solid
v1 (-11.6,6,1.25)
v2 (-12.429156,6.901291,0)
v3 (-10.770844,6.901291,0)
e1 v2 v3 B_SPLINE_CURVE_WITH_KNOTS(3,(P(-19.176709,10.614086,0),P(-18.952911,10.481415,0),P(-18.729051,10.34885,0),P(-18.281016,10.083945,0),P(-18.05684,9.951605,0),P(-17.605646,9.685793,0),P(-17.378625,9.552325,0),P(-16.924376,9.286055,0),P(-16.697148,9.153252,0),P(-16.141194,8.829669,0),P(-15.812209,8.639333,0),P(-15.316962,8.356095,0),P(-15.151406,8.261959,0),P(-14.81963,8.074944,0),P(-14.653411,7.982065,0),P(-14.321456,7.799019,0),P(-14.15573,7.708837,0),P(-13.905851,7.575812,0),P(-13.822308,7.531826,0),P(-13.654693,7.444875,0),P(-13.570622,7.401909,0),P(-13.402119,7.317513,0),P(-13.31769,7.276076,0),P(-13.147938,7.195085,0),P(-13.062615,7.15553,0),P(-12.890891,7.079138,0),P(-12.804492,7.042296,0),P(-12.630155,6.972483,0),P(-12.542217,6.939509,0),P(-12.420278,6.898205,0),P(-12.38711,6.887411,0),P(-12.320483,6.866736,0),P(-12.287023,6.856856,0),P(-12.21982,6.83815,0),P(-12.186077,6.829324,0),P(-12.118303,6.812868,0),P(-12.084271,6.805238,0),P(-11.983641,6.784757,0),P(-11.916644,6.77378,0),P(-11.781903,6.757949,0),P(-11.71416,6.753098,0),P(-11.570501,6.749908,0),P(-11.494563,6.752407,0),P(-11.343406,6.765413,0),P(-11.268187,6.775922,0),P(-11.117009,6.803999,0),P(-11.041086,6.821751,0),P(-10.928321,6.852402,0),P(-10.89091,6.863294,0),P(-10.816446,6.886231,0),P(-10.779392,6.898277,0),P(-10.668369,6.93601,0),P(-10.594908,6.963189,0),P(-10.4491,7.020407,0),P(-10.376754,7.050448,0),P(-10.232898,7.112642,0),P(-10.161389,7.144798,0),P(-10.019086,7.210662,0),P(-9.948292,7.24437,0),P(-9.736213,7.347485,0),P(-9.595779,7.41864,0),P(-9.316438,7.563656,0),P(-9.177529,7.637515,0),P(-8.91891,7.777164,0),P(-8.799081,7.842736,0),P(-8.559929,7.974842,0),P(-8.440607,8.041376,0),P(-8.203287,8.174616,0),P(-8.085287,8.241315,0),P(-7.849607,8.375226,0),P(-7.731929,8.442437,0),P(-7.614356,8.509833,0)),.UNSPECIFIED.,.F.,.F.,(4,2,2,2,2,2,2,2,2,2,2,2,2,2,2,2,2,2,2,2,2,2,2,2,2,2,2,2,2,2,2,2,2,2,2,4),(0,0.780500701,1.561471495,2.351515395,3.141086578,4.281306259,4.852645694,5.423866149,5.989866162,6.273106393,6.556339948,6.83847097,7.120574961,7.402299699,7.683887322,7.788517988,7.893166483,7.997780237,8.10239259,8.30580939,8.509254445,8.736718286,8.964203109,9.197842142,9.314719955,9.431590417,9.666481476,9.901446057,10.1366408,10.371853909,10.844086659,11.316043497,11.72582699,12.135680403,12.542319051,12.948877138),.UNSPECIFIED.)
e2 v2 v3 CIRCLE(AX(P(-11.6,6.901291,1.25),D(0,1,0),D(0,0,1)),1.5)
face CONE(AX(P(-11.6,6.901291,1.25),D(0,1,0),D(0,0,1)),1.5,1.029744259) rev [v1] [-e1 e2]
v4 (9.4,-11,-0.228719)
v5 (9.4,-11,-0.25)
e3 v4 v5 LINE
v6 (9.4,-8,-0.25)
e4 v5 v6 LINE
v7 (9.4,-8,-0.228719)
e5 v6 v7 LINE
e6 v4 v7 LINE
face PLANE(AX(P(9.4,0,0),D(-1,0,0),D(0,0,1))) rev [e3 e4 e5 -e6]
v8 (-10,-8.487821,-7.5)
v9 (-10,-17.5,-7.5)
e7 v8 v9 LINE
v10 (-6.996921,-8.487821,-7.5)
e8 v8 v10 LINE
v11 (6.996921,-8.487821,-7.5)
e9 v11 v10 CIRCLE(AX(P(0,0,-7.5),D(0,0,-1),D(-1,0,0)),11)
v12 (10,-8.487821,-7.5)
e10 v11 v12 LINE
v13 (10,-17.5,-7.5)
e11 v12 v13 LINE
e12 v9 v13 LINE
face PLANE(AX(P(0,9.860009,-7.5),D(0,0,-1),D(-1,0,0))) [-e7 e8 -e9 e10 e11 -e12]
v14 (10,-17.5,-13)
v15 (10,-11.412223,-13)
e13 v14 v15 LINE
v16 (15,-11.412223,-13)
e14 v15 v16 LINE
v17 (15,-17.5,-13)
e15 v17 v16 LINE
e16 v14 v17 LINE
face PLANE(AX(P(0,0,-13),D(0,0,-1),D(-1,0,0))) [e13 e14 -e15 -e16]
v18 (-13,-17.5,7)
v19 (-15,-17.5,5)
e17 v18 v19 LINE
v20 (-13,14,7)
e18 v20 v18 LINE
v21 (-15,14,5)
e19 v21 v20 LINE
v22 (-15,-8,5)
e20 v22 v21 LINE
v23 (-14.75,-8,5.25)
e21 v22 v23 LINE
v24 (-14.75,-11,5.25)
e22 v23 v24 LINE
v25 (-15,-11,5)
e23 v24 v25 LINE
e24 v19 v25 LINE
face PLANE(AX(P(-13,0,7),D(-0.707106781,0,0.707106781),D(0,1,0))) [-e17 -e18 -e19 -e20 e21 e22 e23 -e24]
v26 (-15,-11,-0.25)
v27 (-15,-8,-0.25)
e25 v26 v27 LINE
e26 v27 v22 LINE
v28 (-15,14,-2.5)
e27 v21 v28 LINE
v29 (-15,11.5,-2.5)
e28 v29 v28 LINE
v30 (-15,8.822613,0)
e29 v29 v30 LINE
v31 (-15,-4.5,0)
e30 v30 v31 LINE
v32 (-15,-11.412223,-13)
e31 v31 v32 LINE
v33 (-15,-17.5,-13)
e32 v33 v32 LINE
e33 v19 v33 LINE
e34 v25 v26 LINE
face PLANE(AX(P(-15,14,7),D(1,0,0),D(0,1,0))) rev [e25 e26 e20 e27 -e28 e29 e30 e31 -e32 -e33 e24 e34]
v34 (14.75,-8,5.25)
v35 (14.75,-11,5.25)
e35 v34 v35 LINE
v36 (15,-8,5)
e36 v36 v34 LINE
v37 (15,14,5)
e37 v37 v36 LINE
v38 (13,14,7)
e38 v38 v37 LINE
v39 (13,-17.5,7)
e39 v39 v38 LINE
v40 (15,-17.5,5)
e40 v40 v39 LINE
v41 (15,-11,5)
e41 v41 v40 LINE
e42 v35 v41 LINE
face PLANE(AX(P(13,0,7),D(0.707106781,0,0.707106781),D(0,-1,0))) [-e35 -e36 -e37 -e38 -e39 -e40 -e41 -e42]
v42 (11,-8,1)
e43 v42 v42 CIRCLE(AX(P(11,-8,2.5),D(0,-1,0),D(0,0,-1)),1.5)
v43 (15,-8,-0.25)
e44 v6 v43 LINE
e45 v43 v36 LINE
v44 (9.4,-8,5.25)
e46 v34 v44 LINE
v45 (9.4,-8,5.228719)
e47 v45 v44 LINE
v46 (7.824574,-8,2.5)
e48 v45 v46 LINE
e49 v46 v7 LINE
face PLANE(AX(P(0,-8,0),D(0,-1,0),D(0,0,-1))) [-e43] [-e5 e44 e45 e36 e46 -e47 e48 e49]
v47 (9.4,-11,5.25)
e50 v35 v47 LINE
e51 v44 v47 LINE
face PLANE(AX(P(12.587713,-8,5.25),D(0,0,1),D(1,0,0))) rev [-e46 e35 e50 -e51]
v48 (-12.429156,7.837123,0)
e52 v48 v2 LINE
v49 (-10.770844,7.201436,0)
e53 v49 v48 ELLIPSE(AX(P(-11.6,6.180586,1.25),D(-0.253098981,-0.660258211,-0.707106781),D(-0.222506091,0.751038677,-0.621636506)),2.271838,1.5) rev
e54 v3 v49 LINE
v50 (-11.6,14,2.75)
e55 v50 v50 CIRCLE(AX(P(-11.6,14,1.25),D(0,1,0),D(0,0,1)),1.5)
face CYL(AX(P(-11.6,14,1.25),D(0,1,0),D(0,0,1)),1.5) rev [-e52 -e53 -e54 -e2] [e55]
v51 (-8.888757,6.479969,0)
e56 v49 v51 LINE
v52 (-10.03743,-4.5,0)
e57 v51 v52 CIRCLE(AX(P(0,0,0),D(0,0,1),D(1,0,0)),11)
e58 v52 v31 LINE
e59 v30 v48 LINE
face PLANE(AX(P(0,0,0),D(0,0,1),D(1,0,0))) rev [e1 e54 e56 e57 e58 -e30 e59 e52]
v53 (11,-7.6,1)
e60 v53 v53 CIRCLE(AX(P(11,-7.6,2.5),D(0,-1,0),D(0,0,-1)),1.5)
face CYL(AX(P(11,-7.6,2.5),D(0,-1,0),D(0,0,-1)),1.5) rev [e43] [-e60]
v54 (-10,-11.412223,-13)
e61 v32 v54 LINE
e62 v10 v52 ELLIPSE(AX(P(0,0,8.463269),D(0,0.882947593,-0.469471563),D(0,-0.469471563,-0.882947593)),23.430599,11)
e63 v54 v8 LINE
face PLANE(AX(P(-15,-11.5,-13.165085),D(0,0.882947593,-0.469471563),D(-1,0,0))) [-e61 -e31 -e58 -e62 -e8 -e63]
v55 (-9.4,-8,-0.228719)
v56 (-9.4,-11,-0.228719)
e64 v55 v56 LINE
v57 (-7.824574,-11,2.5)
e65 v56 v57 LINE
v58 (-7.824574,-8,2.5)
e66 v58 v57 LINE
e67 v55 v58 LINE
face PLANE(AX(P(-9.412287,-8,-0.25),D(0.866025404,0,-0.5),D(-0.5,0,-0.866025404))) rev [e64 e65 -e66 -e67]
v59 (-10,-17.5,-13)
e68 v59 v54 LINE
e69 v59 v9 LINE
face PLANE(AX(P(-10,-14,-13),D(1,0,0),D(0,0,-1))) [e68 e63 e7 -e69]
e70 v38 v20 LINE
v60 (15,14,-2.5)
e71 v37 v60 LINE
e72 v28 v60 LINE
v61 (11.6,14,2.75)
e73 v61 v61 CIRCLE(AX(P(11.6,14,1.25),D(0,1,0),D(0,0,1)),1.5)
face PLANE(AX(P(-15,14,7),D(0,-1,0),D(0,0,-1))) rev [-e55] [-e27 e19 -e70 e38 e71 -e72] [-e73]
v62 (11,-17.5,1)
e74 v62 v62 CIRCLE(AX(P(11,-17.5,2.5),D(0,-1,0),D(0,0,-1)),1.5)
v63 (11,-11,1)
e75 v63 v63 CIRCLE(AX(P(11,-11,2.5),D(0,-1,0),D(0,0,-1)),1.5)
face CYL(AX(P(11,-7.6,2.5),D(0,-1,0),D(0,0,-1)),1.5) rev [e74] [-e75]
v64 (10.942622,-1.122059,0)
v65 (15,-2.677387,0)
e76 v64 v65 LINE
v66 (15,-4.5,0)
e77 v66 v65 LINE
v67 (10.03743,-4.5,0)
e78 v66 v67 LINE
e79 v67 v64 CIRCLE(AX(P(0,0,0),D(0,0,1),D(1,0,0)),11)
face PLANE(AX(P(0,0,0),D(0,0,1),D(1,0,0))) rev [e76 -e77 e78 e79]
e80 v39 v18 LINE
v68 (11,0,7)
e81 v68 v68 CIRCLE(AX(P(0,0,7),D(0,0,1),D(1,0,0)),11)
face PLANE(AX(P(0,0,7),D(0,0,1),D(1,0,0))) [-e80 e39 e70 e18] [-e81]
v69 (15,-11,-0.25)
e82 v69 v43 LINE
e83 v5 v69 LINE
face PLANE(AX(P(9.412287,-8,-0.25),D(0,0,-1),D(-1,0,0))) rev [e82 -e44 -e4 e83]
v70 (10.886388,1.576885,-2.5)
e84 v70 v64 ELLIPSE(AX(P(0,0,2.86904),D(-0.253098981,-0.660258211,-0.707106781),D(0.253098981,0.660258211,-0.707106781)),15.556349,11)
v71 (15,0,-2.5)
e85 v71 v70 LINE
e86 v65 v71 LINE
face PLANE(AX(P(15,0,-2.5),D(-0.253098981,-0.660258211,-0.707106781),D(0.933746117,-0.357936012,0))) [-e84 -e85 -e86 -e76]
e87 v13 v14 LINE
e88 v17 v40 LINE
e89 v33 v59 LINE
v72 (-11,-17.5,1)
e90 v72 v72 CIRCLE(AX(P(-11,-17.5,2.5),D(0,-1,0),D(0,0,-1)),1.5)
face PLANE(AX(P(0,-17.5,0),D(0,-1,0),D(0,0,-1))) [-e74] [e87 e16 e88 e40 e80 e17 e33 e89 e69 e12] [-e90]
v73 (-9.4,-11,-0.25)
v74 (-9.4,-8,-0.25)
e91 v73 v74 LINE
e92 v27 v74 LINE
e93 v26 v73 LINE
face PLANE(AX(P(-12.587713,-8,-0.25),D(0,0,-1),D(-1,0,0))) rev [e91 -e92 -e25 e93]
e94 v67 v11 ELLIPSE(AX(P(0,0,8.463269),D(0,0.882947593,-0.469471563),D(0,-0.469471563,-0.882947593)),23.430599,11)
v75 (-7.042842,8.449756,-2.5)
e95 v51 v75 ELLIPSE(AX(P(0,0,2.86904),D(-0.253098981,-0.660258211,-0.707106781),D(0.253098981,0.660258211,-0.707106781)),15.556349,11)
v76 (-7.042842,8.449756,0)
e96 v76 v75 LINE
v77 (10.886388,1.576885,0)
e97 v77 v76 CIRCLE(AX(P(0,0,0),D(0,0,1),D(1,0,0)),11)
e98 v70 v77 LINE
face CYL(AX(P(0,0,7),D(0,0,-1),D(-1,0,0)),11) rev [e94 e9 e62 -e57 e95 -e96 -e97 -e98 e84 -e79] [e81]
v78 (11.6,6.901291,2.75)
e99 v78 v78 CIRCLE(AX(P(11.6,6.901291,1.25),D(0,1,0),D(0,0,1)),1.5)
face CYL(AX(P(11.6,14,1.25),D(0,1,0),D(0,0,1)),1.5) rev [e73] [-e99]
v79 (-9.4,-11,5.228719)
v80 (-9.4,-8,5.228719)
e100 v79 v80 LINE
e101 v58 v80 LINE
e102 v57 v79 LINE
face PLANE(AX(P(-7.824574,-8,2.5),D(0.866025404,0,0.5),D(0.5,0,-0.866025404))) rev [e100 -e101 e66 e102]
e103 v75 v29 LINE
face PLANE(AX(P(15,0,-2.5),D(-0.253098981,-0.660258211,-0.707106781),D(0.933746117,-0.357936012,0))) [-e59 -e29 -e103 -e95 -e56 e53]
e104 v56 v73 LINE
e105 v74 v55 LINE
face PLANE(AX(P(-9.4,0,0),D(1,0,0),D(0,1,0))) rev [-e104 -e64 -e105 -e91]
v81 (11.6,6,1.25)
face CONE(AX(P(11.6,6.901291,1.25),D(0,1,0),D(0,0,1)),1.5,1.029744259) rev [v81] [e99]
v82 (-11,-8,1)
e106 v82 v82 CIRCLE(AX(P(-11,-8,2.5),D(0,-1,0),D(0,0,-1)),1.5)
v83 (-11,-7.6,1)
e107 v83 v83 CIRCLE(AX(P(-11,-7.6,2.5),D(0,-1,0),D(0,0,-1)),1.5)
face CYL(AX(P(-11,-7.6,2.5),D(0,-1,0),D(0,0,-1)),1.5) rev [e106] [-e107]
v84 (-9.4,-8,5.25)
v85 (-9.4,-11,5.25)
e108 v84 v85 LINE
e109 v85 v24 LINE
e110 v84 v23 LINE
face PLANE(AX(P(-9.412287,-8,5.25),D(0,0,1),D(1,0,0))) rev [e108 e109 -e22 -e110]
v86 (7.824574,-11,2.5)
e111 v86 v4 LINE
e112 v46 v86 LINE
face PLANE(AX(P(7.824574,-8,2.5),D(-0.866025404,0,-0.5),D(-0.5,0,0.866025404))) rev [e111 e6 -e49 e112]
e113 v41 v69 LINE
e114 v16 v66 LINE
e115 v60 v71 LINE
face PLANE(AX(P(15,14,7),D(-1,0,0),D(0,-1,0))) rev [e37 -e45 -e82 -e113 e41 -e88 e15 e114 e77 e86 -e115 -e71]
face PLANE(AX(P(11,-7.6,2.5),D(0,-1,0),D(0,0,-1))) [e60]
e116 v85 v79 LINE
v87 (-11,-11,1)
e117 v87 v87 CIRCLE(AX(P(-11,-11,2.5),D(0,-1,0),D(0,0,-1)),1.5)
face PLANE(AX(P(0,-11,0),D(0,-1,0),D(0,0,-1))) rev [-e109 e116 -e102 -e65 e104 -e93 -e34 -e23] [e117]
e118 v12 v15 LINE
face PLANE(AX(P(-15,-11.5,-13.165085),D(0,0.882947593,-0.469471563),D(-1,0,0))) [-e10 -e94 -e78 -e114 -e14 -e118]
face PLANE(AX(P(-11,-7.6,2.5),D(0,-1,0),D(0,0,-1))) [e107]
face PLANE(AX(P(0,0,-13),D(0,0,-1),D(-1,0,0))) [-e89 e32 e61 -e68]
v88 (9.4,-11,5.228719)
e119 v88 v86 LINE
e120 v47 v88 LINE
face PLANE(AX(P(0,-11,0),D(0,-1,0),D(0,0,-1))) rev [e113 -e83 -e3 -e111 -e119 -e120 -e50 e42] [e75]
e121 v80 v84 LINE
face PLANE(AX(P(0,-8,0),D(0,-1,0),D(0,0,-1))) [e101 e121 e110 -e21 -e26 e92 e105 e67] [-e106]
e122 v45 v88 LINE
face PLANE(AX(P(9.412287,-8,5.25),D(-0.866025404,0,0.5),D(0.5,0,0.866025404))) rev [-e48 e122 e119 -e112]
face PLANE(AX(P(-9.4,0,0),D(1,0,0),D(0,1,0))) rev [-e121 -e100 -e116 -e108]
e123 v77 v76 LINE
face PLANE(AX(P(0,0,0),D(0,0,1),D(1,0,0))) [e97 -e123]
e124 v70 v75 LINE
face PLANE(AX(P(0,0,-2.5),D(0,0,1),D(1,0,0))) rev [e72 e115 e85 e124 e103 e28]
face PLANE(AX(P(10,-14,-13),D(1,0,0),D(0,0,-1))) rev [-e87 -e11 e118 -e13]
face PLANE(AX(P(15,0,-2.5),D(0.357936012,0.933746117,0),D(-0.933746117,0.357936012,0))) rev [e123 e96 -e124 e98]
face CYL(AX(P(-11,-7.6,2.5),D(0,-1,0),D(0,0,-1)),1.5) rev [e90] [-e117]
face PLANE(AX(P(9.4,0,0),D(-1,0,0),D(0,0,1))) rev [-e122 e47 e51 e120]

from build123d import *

# Parameters (mm, degrees)
SKETCH1_W                 = 30
SKETCH1_H                 = 28
SKETCH1_R                 = 11
BOSS_EXTRUDE1_DEPTH       = 7
SKETCH2_W                 = 5
SKETCH2_H                 = 2.5
BOSS_EXTRUDE2_DEPTH       = 13
CHAMFER2_SIZE             = 2
BOSS_EXTRUDE6_DEPTH       = 2.5
CHAMFER3_SIZE             = 2
CHAMFER4_SIZE             = 2
BOSS_EXTRUDE4_DEPTH       = 2.5
CHAMFER6_SIZE             = 2.5
CHAMFER7_SIZE             = 7
CHAMFER7_SIZE_2           = 13.165085257
SKETCH7_R                 = 1.5
CUT_EXTRUDE2_DEPTH        = 6.4
CUT_EXTRUDE3_START        = -3
SKETCH9_R                 = 1.5
CUT_EXTRUDE3_DEPTH        = 3
SKETCH10_W                = 5.5
SKETCH10_H                = 3
CUT_EXTRUDE4_DEPTH        = 5.6
CUT_EXTRUDE5_START        = -30
SKETCH10_2_W              = 5.5
SKETCH10_2_H              = 3
CUT_EXTRUDE5_DEPTH        = 5.6
F_1_0MM_DOWEL_HOLE1_D     = 3
F_1_0MM_DOWEL_HOLE1_DEPTH = 7.098709071
F_1_0MM_DOWEL_HOLE1_TIP   = 0.901290929
BOSS_EXTRUDE7_START       = 3.5
SKETCH17_R                = 1.5
BOSS_EXTRUDE7_DEPTH       = 3.5


with BuildPart() as part:
    # Sketch1 → Boss-Extrude1 (new body)
    with BuildSketch(Plane.XY):
        Rectangle(SKETCH1_W, SKETCH1_H)
        Circle(SKETCH1_R, mode=Mode.SUBTRACT)
    extrude(amount=BOSS_EXTRUDE1_DEPTH)

    # Sketch2 → Boss-Extrude2 (add)
    with BuildSketch(Plane(origin=(0, 0, 0), x_dir=(-1, 0, 0), z_dir=(0, 0, -1))):
        with Locations((-12.5, -12.75)):
            Rectangle(SKETCH2_W, SKETCH2_H)
        with Locations((12.5, -12.75)):
            Rectangle(SKETCH2_W, SKETCH2_H)
    extrude(amount=BOSS_EXTRUDE2_DEPTH)

    # Chamfer2
    chamfer2_edges = [part.edges().sort_by_distance(p)[0] for p in [
        (-10, -12.75, 0),
        (10, -12.75, 0),
    ]]
    chamfer(chamfer2_edges, length=CHAMFER2_SIZE)

    # Sketch5 → Boss-Extrude6 (add)
    with BuildSketch(Plane.XZ.offset(14)):
        Polygon((-10, -2), (-10, -7.5), (10, -7.5), (10, -2), (8, 0), (-8, 0), align=None)
    extrude(amount=-BOSS_EXTRUDE6_DEPTH)

    # Chamfer3
    chamfer3_edges = [part.edges().sort_by_distance(p)[0] for p in [
        (15, 0, 7),
    ]]
    chamfer(chamfer3_edges, length=CHAMFER3_SIZE)

    # Chamfer4
    chamfer4_edges = [part.edges().sort_by_distance(p)[0] for p in [
        (-15, 0, 7),
    ]]
    chamfer(chamfer4_edges, length=CHAMFER4_SIZE)

    # Sketch4 → Boss-Extrude4 (add)
    with BuildSketch(Plane(origin=(0, 0, 0), x_dir=(-1, 0, 0), z_dir=(0, 0, -1))):
        Polygon((-15, 0), (15, 11.5), (15, 14), (-15, 14), align=None)
    extrude(amount=BOSS_EXTRUDE4_DEPTH)

    # Chamfer6
    # the kernel refuses this chamfer: 2.5 mm, written as the material it adds along each edge
    with BuildSketch(Plane(origin=(21.003247512, -2.30124488, 0), x_dir=(-0.3578006820796162, -0.9333930836859554, 0.02749587661058638), z_dir=(-0.9337461173020497, 0.35793601163245237, 0))) as chamfer6_piece_1_section:
        Polygon((CHAMFER6_SIZE * 0.999621916911, -CHAMFER6_SIZE * 0.0274958766106), (-CHAMFER6_SIZE * 0.0274958766106, -CHAMFER6_SIZE * 0.999621916911), (0, 0), align=None)
    chamfer6_piece_1 = extrude(amount=17.263908412, mode=Mode.PRIVATE)
    chamfer6_piece_1 = chamfer6_piece_1 - Plane(origin=(0, 0, -0.835393566), x_dir=(1, 0, 0), z_dir=(0, 0, -1)) * Cylinder(11, 45, mode=Mode.PRIVATE)
    chamfer6_piece_1 = split(chamfer6_piece_1, bisect_by=Plane(origin=(15, -0.113968884, -0.835393566), z_dir=(-1, 0, 0)), keep=Keep.TOP, mode=Mode.PRIVATE)
    add(chamfer6_piece_1)
    with BuildSketch(Plane(origin=(-1.03959441, 6.148511191, 0), x_dir=(-0.35780068207961624, -0.9333930836859554, 0.02749587661058638), z_dir=(-0.9337461173020497, 0.35793601163245237, 0))) as chamfer6_piece_2_section:
        Polygon((CHAMFER6_SIZE * 0.999621916911, -CHAMFER6_SIZE * 0.0274958766106), (-CHAMFER6_SIZE * 0.0274958766106, -CHAMFER6_SIZE * 0.999621916911), (0, 0), align=None)
    chamfer6_piece_2 = extrude(amount=21.380172546, mode=Mode.PRIVATE)
    chamfer6_piece_2 = chamfer6_piece_2 - Plane(origin=(0, 0, -0.851534645), x_dir=(1, 0, 0), z_dir=(0, 0, -1)) * Cylinder(11, 53, mode=Mode.PRIVATE)
    chamfer6_piece_2 = split(chamfer6_piece_2, bisect_by=Plane(origin=(-15, 9.244820467, -0.851534645), z_dir=(1, 0, 0)), keep=Keep.TOP, mode=Mode.PRIVATE)
    add(chamfer6_piece_2)

    # Chamfer7
    # the kernel refuses this chamfer: 13.165085257, 7 mm, written as the material it adds along each edge
    with BuildSketch(Plane(origin=(-15, -11.5, 0), x_dir=(0, 0.9979482451756082, 0.06402577567608186), z_dir=(1, 0, 0))) as chamfer7_piece_1_section:
        Polygon((CHAMFER7_SIZE * 0.997948245176, -CHAMFER7_SIZE * 0.0640257756761), (-CHAMFER7_SIZE_2 * 0.0640257756781, -CHAMFER7_SIZE_2 * 0.997948245208), (0, 0), align=None)
    chamfer7_piece_1 = extrude(amount=30, mode=Mode.PRIVATE)
    chamfer7_piece_1 = chamfer7_piece_1 - Plane(origin=(0, 0, -3.073682767), x_dir=(1, 0, 0), z_dir=(0, 0, -1)) * Cylinder(11, 113, mode=Mode.PRIVATE)
    chamfer7_piece_1 = split(chamfer7_piece_1, bisect_by=Plane(origin=(-10, -8.887755394, -3.073682767), z_dir=(-1, 0, 0)), keep=Keep.TOP, mode=Mode.PRIVATE)
    chamfer7_piece_1 = split(chamfer7_piece_1, bisect_by=Plane(origin=(-12.500128058, -8.887755394, -7.5), z_dir=(0, 0, 1)), keep=Keep.TOP, mode=Mode.PRIVATE)
    add(chamfer7_piece_1)
    with BuildSketch(Plane(origin=(-15, -11.5, 0), x_dir=(0, 0.9979482451756082, 0.06402577567608186), z_dir=(1, 0, 0))) as chamfer7_piece_2_section:
        Polygon((CHAMFER7_SIZE * 0.997948245176, -CHAMFER7_SIZE * 0.0640257756761), (-CHAMFER7_SIZE_2 * 0.0640257756781, -CHAMFER7_SIZE_2 * 0.997948245208), (0, 0), align=None)
    chamfer7_piece_2 = extrude(amount=30, mode=Mode.PRIVATE)
    chamfer7_piece_2 = split(chamfer7_piece_2, bisect_by=Plane(origin=(-10, -10.721530873, -9.597564575), z_dir=(-1, 0, 0)), keep=Keep.TOP, mode=Mode.PRIVATE)
    chamfer7_piece_2 = split(chamfer7_piece_2, bisect_by=Plane(origin=(-12.5, -10.721530873, -7.5), z_dir=(0, 0, -1)), keep=Keep.TOP, mode=Mode.PRIVATE)
    chamfer7_piece_2 = split(chamfer7_piece_2, bisect_by=Plane(origin=(-12.5, -10.721530873, -13), z_dir=(0, 0, 1)), keep=Keep.TOP, mode=Mode.PRIVATE)
    add(chamfer7_piece_2)
    with BuildSketch(Plane(origin=(-15, -11.5, 0), x_dir=(0, 0.9979482451756082, 0.06402577567608186), z_dir=(1, 0, 0))) as chamfer7_piece_3_section:
        Polygon((CHAMFER7_SIZE * 0.997948245176, -CHAMFER7_SIZE * 0.0640257756761), (-CHAMFER7_SIZE_2 * 0.0640257756781, -CHAMFER7_SIZE_2 * 0.997948245208), (0, 0), align=None)
    chamfer7_piece_3 = extrude(amount=30, mode=Mode.PRIVATE)
    chamfer7_piece_3 = chamfer7_piece_3 - Plane(origin=(0, 0, -3.793876077), x_dir=(1, 0, 0), z_dir=(0, 0, -1)) * Cylinder(11, 113, mode=Mode.PRIVATE)
    chamfer7_piece_3 = split(chamfer7_piece_3, bisect_by=Plane(origin=(-10, -6.598719884, -3.793876077), z_dir=(1, 0, 0)), keep=Keep.TOP, mode=Mode.PRIVATE)
    chamfer7_piece_3 = split(chamfer7_piece_3, bisect_by=Plane(origin=(-9.499486782, -6.598719884, -7.5), z_dir=(0, 0, 1)), keep=Keep.TOP, mode=Mode.PRIVATE)
    chamfer7_piece_3 = split(chamfer7_piece_3, bisect_by=Plane(origin=(10, -6.598719884, -3.793876077), z_dir=(-1, 0, 0)), keep=Keep.TOP, mode=Mode.PRIVATE)
    add(chamfer7_piece_3)
    with BuildSketch(Plane(origin=(-15, -11.5, 0), x_dir=(0, 0.9979482451756082, 0.06402577567608186), z_dir=(1, 0, 0))) as chamfer7_piece_4_section:
        Polygon((CHAMFER7_SIZE * 0.997948245176, -CHAMFER7_SIZE * 0.0640257756761), (-CHAMFER7_SIZE_2 * 0.0640257756781, -CHAMFER7_SIZE_2 * 0.997948245208), (0, 0), align=None)
    chamfer7_piece_4 = extrude(amount=30, mode=Mode.PRIVATE)
    chamfer7_piece_4 = split(chamfer7_piece_4, bisect_by=Plane(origin=(12.5, -10.721530873, -7.5), z_dir=(0, 0, -1)), keep=Keep.TOP, mode=Mode.PRIVATE)
    chamfer7_piece_4 = split(chamfer7_piece_4, bisect_by=Plane(origin=(10, -10.721530873, -9.597564575), z_dir=(1, 0, 0)), keep=Keep.TOP, mode=Mode.PRIVATE)
    chamfer7_piece_4 = split(chamfer7_piece_4, bisect_by=Plane(origin=(12.5, -10.721530873, -13), z_dir=(0, 0, 1)), keep=Keep.TOP, mode=Mode.PRIVATE)
    add(chamfer7_piece_4)
    with BuildSketch(Plane(origin=(-15, -11.5, 0), x_dir=(0, 0.9979482451756082, 0.06402577567608186), z_dir=(1, 0, 0))) as chamfer7_piece_5_section:
        Polygon((CHAMFER7_SIZE * 0.997948245176, -CHAMFER7_SIZE * 0.0640257756761), (-CHAMFER7_SIZE_2 * 0.0640257756781, -CHAMFER7_SIZE_2 * 0.997948245208), (0, 0), align=None)
    chamfer7_piece_5 = extrude(amount=30, mode=Mode.PRIVATE)
    chamfer7_piece_5 = chamfer7_piece_5 - Plane(origin=(0, 0, -3.073682766), x_dir=(1, 0, 0), z_dir=(0, 0, -1)) * Cylinder(11, 113, mode=Mode.PRIVATE)
    chamfer7_piece_5 = split(chamfer7_piece_5, bisect_by=Plane(origin=(12.500128057, -8.887755394, -7.5), z_dir=(0, 0, 1)), keep=Keep.TOP, mode=Mode.PRIVATE)
    chamfer7_piece_5 = split(chamfer7_piece_5, bisect_by=Plane(origin=(10, -8.887755394, -3.073682766), z_dir=(1, 0, 0)), keep=Keep.TOP, mode=Mode.PRIVATE)
    add(chamfer7_piece_5)

    # Sketch7 → Cut-Extrude2 (cut)
    with BuildSketch(Plane.XZ.offset(14)):
        with Locations(Location((-11, 2.5, 0), (0, 0, 270))):
            Circle(SKETCH7_R)
        with Locations(Location((11, 2.5, 0), (0, 0, 270))):
            Circle(SKETCH7_R)
    extrude(amount=-CUT_EXTRUDE2_DEPTH, mode=Mode.SUBTRACT)

    # Sketch9 → Cut-Extrude3 (cut)
    # profile 1 of 2: a face of its own
    with BuildSketch(Plane.XZ.offset(14).offset(CUT_EXTRUDE3_START)):
        Polygon((7.824573519, 2.5), (9.41228676, -0.25), (12.58771324, -0.25), (14.175426481, 2.5), (12.58771324, 5.25), (9.41228676, 5.25), align=None)
        with Locations(Location((11, 2.5, 0), (0, 0, 270))):
            Circle(SKETCH9_R, mode=Mode.SUBTRACT)
    # profile 2 of 2: a face of its own
    with BuildSketch(Plane.XZ.offset(14).offset(CUT_EXTRUDE3_START)):
        Polygon((-7.824573519, 2.5), (-9.41228676, 5.25), (-12.58771324, 5.25), (-14.175426481, 2.5), (-12.58771324, -0.25), (-9.41228676, -0.25), align=None)
        with Locations(Location((-11, 2.5, 0), (0, 0, 270))):
            Circle(SKETCH9_R, mode=Mode.SUBTRACT)
    extrude(amount=-CUT_EXTRUDE3_DEPTH, mode=Mode.SUBTRACT)

    # Sketch10 → Cut-Extrude4 (cut)
    with BuildSketch(Plane(origin=(15, 0, 0), x_dir=(0, 0, -1), z_dir=(1, 0, 0))):
        with Locations((-2.5, -9.5)):
            Rectangle(SKETCH10_W, SKETCH10_H)
    extrude(amount=-CUT_EXTRUDE4_DEPTH, mode=Mode.SUBTRACT)

    # Sketch10<2> → Cut-Extrude5 (cut)
    with BuildSketch(Plane(origin=(15, 0, 0), x_dir=(0, 0, -1), z_dir=(1, 0, 0)).offset(CUT_EXTRUDE5_START)):
        with Locations((-2.5, -9.5)):
            Rectangle(SKETCH10_2_W, SKETCH10_2_H)
    extrude(amount=CUT_EXTRUDE5_DEPTH, mode=Mode.SUBTRACT)

    # Ø1.0mm Dowel Hole1
    with Locations(Plane(origin=(0, 14, 0), x_dir=(1, 0, 0), z_dir=(0, 1, 0))):
        with Locations((-11.6, -1.25), (11.6, -1.25)):
            Hole(F_1_0MM_DOWEL_HOLE1_D / 2, depth=F_1_0MM_DOWEL_HOLE1_DEPTH)
            with Locations((0, 0, -(F_1_0MM_DOWEL_HOLE1_DEPTH + F_1_0MM_DOWEL_HOLE1_TIP / 2))):  # 118° drill point
                Cone(0, F_1_0MM_DOWEL_HOLE1_D / 2, F_1_0MM_DOWEL_HOLE1_TIP, mode=Mode.SUBTRACT)

    # Sketch17 → Boss-Extrude7 (add)
    with BuildSketch(Plane.XZ.offset(14).offset(BOSS_EXTRUDE7_START)):
        Polygon((13, 7), (-13, 7), (-15, 5), (-15, -13), (-10, -13), (-10, -7.5), (10, -7.5), (10, -13), (15, -13), (15, 5), align=None)
        with Locations(Location((-11, 2.5, 0), (0, 0, 270))):
            Circle(SKETCH17_R, mode=Mode.SUBTRACT)
        with Locations(Location((11, 2.5, 0), (0, 0, 270))):
            Circle(SKETCH17_R, mode=Mode.SUBTRACT)
    extrude(amount=-BOSS_EXTRUDE7_DEPTH)


solid = part.part
